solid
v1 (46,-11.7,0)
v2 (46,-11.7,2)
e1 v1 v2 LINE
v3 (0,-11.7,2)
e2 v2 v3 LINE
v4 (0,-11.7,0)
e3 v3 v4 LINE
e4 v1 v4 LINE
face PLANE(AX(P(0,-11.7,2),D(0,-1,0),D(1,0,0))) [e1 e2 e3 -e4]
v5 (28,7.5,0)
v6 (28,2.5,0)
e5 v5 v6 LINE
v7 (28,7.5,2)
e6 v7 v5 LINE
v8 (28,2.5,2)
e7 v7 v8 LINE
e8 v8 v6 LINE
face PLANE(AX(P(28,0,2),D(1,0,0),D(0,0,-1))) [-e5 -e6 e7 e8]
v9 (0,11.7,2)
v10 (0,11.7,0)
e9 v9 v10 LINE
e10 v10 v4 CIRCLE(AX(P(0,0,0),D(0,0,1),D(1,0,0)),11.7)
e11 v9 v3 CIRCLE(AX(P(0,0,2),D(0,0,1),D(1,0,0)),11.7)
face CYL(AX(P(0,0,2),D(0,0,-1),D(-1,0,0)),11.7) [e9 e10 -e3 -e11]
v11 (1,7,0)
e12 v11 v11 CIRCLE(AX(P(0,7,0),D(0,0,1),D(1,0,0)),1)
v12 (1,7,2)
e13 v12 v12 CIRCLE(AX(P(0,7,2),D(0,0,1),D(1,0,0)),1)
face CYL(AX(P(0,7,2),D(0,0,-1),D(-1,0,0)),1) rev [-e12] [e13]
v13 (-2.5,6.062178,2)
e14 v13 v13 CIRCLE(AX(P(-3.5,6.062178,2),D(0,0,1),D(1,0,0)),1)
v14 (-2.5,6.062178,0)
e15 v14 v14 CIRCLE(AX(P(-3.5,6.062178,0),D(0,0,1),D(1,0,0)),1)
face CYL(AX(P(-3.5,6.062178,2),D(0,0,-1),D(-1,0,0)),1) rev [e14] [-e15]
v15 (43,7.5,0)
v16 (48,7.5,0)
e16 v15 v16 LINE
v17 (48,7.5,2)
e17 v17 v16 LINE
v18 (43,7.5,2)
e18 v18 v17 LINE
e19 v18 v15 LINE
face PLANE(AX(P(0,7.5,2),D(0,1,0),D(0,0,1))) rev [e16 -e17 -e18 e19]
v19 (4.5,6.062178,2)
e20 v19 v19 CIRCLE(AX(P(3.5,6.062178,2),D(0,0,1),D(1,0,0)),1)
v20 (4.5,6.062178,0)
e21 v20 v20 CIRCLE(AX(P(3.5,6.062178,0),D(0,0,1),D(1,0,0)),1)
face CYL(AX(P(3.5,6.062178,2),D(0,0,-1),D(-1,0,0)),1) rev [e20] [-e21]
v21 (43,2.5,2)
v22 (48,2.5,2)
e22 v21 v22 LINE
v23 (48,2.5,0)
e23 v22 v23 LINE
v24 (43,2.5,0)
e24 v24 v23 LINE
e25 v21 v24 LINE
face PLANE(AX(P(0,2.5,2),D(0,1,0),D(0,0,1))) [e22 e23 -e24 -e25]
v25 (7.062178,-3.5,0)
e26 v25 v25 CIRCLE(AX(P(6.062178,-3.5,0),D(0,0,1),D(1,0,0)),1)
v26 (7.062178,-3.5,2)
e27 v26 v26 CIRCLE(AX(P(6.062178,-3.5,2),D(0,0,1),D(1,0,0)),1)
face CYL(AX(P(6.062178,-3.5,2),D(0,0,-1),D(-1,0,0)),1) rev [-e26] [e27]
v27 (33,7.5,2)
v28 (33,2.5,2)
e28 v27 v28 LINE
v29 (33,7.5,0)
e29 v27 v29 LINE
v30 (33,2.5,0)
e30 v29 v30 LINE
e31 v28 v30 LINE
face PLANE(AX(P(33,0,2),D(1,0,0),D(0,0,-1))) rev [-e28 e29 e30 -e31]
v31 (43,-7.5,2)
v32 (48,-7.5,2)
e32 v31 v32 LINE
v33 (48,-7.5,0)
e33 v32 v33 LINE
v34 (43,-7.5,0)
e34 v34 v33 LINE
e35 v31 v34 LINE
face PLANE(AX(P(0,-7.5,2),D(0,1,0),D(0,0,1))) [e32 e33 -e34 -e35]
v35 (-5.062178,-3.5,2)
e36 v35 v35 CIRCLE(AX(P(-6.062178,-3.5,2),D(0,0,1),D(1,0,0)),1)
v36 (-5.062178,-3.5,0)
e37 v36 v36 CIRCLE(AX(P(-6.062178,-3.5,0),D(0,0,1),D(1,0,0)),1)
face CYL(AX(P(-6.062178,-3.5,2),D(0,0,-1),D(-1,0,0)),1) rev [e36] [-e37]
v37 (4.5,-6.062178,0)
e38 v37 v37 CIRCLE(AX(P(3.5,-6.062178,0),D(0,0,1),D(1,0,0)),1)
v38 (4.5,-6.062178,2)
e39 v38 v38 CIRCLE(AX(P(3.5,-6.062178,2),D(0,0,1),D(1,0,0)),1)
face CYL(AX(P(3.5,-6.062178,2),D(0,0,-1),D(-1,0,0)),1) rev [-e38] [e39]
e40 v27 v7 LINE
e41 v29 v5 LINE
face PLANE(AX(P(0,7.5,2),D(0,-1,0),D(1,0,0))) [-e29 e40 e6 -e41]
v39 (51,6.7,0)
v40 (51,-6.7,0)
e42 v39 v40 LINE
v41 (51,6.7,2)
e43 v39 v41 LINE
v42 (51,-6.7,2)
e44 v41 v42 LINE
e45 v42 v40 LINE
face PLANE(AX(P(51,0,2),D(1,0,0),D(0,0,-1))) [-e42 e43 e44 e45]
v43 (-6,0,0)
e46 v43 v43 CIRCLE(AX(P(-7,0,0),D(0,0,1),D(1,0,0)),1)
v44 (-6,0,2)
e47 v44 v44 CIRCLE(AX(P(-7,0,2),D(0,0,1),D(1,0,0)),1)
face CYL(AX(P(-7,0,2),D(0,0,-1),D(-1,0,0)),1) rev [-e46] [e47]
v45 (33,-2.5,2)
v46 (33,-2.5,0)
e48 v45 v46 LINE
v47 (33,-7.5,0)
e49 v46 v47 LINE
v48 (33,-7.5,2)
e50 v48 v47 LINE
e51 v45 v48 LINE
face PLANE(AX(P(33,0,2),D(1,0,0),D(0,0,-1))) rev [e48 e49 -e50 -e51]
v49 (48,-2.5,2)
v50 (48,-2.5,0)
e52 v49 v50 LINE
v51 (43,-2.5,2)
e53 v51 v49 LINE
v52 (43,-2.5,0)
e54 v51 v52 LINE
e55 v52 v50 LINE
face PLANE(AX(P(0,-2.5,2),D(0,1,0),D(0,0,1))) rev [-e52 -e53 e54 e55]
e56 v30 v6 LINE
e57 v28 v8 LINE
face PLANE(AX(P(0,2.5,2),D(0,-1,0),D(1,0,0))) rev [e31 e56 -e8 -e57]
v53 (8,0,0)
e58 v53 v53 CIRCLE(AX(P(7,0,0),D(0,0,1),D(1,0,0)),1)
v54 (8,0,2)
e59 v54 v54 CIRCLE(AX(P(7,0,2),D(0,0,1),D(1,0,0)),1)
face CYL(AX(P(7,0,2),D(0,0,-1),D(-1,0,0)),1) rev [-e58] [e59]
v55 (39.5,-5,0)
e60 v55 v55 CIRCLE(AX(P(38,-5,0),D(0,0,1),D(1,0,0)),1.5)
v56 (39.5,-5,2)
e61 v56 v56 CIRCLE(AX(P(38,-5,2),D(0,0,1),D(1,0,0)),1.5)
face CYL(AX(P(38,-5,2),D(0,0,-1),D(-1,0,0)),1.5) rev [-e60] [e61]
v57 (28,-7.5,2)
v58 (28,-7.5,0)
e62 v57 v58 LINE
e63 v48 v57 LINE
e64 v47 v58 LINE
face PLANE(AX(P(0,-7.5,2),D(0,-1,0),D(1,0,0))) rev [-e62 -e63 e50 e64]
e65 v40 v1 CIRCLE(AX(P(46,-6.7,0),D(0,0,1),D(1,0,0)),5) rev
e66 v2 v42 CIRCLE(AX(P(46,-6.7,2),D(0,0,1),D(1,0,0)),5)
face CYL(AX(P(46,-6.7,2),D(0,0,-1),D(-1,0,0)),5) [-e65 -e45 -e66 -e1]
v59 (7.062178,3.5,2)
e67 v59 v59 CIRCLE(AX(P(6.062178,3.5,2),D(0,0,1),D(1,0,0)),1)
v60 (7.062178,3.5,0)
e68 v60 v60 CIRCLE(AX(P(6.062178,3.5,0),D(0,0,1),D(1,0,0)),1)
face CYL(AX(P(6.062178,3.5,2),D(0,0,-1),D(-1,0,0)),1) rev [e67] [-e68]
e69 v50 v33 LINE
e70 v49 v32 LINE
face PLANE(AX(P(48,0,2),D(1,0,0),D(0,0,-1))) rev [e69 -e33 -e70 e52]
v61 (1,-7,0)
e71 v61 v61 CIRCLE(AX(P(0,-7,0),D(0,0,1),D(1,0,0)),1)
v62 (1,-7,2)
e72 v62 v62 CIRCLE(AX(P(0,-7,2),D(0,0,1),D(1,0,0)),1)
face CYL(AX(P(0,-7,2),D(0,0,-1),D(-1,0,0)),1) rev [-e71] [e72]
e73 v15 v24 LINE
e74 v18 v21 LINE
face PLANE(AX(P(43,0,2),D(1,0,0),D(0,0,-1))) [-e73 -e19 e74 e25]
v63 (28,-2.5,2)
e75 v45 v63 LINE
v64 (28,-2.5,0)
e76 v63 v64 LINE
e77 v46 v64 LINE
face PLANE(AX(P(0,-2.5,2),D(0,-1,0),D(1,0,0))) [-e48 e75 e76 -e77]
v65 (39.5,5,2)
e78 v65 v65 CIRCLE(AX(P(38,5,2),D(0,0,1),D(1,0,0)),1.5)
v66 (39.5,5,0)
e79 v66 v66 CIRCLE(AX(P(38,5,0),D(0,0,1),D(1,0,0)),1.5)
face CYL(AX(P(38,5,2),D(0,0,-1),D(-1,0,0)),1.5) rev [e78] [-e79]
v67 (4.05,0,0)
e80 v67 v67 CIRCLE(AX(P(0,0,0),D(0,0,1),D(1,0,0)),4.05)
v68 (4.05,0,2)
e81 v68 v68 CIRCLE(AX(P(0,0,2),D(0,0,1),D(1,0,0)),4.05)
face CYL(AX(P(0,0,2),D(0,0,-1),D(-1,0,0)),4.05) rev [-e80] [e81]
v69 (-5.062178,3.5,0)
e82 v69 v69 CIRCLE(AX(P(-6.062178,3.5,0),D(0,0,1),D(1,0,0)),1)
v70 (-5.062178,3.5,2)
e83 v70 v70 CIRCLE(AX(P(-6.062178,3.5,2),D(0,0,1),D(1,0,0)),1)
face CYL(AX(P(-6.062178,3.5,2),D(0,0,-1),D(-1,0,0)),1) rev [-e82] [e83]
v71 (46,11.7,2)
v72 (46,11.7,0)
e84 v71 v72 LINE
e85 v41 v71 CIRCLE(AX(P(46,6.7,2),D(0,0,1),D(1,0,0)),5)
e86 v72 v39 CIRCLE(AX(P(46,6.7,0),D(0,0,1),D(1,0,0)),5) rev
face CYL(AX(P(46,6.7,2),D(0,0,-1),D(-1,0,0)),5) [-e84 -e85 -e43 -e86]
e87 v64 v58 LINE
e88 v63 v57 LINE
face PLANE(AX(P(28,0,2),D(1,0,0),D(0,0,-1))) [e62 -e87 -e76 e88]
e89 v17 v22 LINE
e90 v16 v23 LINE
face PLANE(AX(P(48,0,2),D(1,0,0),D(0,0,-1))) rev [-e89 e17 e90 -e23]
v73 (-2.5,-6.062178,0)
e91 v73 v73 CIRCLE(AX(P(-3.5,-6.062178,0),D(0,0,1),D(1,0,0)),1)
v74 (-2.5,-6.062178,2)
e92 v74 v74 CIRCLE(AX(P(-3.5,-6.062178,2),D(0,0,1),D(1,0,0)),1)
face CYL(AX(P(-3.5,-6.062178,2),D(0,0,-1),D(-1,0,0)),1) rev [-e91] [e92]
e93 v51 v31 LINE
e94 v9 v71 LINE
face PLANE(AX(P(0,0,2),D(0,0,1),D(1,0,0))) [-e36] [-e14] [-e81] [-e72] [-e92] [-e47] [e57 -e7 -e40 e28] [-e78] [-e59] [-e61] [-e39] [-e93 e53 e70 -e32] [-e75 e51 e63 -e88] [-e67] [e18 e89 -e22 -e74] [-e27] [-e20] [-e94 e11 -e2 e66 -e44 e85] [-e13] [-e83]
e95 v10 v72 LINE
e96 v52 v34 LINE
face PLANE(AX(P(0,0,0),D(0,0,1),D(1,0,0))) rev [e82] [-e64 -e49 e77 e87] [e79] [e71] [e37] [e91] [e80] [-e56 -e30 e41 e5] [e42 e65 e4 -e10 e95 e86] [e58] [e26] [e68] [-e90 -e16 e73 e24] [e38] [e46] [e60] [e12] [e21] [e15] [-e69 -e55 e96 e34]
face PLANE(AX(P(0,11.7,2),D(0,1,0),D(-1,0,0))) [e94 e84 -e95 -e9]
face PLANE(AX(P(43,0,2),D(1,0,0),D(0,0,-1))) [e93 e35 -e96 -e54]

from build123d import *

# Parameters (mm, degrees)
BOSS_EXTRUDE1_OUTLINE_R   = 1
BOSS_EXTRUDE1_OUTLINE_W   = 5
BOSS_EXTRUDE1_OUTLINE_H   = 5
BOSS_EXTRUDE1_OUTLINE_R_2 = 1.5
BOSS_EXTRUDE1_OUTLINE_R_3 = 4.05
BOSS_EXTRUDE1_DEPTH       = 2
CONG_1_R                  = 5


# Read off the part's stored shape, not the designer's step: Boss-Extrude1
with BuildPart() as part:
    # Boss-Extrude1 outline → Boss-Extrude1 (new body)
    with BuildSketch(Plane.XY):
        with BuildLine():
            Line((51, -11.7), (51, 11.7))
            Line((51, 11.7), (0, 11.7))
            ThreePointArc((0, 11.7), (-11.7, 0), (0, -11.7))
            Line((0, -11.7), (51, -11.7))
        make_face()
        with Locations((0, -7)):
            Circle(BOSS_EXTRUDE1_OUTLINE_R, mode=Mode.SUBTRACT)
        with Locations((-3.5, -6.062177826)):
            Circle(BOSS_EXTRUDE1_OUTLINE_R, mode=Mode.SUBTRACT)
        with Locations((3.5, -6.062177826)):
            Circle(BOSS_EXTRUDE1_OUTLINE_R, mode=Mode.SUBTRACT)
        with Locations((-6.062177826, -3.5)):
            Circle(BOSS_EXTRUDE1_OUTLINE_R, mode=Mode.SUBTRACT)
        with Locations((6.062177826, -3.5)):
            Circle(BOSS_EXTRUDE1_OUTLINE_R, mode=Mode.SUBTRACT)
        with Locations((30.5, -5)):
            Rectangle(BOSS_EXTRUDE1_OUTLINE_W, BOSS_EXTRUDE1_OUTLINE_H, mode=Mode.SUBTRACT)
        with Locations((38, -5)):
            Circle(BOSS_EXTRUDE1_OUTLINE_R_2, mode=Mode.SUBTRACT)
        with Locations((45.5, -5)):
            Rectangle(BOSS_EXTRUDE1_OUTLINE_W, BOSS_EXTRUDE1_OUTLINE_H, mode=Mode.SUBTRACT)
        with Locations((-7, 0)):
            Circle(BOSS_EXTRUDE1_OUTLINE_R, mode=Mode.SUBTRACT)
        Circle(BOSS_EXTRUDE1_OUTLINE_R_3, mode=Mode.SUBTRACT)
        with Locations((-6.062177826, 3.5)):
            Circle(BOSS_EXTRUDE1_OUTLINE_R, mode=Mode.SUBTRACT)
        with Locations((7, 0)):
            Circle(BOSS_EXTRUDE1_OUTLINE_R, mode=Mode.SUBTRACT)
        with Locations((6.062177826, 3.5)):
            Circle(BOSS_EXTRUDE1_OUTLINE_R, mode=Mode.SUBTRACT)
        with Locations((-3.5, 6.062177826)):
            Circle(BOSS_EXTRUDE1_OUTLINE_R, mode=Mode.SUBTRACT)
        with Locations((0, 7)):
            Circle(BOSS_EXTRUDE1_OUTLINE_R, mode=Mode.SUBTRACT)
        with Locations((3.5, 6.062177826)):
            Circle(BOSS_EXTRUDE1_OUTLINE_R, mode=Mode.SUBTRACT)
        with Locations((30.5, 5)):
            Rectangle(BOSS_EXTRUDE1_OUTLINE_W, BOSS_EXTRUDE1_OUTLINE_H, mode=Mode.SUBTRACT)
        with Locations((38, 5)):
            Circle(BOSS_EXTRUDE1_OUTLINE_R_2, mode=Mode.SUBTRACT)
        with Locations((45.5, 5)):
            Rectangle(BOSS_EXTRUDE1_OUTLINE_W, BOSS_EXTRUDE1_OUTLINE_H, mode=Mode.SUBTRACT)
    extrude(amount=BOSS_EXTRUDE1_DEPTH)

    # Congé1
    cong_1_edges = [part.edges().sort_by_distance(p)[0] for p in [
        (51, 11.7, 1),
        (51, -11.7, 1),
    ]]
    fillet(cong_1_edges, radius=CONG_1_R)


solid = part.part
